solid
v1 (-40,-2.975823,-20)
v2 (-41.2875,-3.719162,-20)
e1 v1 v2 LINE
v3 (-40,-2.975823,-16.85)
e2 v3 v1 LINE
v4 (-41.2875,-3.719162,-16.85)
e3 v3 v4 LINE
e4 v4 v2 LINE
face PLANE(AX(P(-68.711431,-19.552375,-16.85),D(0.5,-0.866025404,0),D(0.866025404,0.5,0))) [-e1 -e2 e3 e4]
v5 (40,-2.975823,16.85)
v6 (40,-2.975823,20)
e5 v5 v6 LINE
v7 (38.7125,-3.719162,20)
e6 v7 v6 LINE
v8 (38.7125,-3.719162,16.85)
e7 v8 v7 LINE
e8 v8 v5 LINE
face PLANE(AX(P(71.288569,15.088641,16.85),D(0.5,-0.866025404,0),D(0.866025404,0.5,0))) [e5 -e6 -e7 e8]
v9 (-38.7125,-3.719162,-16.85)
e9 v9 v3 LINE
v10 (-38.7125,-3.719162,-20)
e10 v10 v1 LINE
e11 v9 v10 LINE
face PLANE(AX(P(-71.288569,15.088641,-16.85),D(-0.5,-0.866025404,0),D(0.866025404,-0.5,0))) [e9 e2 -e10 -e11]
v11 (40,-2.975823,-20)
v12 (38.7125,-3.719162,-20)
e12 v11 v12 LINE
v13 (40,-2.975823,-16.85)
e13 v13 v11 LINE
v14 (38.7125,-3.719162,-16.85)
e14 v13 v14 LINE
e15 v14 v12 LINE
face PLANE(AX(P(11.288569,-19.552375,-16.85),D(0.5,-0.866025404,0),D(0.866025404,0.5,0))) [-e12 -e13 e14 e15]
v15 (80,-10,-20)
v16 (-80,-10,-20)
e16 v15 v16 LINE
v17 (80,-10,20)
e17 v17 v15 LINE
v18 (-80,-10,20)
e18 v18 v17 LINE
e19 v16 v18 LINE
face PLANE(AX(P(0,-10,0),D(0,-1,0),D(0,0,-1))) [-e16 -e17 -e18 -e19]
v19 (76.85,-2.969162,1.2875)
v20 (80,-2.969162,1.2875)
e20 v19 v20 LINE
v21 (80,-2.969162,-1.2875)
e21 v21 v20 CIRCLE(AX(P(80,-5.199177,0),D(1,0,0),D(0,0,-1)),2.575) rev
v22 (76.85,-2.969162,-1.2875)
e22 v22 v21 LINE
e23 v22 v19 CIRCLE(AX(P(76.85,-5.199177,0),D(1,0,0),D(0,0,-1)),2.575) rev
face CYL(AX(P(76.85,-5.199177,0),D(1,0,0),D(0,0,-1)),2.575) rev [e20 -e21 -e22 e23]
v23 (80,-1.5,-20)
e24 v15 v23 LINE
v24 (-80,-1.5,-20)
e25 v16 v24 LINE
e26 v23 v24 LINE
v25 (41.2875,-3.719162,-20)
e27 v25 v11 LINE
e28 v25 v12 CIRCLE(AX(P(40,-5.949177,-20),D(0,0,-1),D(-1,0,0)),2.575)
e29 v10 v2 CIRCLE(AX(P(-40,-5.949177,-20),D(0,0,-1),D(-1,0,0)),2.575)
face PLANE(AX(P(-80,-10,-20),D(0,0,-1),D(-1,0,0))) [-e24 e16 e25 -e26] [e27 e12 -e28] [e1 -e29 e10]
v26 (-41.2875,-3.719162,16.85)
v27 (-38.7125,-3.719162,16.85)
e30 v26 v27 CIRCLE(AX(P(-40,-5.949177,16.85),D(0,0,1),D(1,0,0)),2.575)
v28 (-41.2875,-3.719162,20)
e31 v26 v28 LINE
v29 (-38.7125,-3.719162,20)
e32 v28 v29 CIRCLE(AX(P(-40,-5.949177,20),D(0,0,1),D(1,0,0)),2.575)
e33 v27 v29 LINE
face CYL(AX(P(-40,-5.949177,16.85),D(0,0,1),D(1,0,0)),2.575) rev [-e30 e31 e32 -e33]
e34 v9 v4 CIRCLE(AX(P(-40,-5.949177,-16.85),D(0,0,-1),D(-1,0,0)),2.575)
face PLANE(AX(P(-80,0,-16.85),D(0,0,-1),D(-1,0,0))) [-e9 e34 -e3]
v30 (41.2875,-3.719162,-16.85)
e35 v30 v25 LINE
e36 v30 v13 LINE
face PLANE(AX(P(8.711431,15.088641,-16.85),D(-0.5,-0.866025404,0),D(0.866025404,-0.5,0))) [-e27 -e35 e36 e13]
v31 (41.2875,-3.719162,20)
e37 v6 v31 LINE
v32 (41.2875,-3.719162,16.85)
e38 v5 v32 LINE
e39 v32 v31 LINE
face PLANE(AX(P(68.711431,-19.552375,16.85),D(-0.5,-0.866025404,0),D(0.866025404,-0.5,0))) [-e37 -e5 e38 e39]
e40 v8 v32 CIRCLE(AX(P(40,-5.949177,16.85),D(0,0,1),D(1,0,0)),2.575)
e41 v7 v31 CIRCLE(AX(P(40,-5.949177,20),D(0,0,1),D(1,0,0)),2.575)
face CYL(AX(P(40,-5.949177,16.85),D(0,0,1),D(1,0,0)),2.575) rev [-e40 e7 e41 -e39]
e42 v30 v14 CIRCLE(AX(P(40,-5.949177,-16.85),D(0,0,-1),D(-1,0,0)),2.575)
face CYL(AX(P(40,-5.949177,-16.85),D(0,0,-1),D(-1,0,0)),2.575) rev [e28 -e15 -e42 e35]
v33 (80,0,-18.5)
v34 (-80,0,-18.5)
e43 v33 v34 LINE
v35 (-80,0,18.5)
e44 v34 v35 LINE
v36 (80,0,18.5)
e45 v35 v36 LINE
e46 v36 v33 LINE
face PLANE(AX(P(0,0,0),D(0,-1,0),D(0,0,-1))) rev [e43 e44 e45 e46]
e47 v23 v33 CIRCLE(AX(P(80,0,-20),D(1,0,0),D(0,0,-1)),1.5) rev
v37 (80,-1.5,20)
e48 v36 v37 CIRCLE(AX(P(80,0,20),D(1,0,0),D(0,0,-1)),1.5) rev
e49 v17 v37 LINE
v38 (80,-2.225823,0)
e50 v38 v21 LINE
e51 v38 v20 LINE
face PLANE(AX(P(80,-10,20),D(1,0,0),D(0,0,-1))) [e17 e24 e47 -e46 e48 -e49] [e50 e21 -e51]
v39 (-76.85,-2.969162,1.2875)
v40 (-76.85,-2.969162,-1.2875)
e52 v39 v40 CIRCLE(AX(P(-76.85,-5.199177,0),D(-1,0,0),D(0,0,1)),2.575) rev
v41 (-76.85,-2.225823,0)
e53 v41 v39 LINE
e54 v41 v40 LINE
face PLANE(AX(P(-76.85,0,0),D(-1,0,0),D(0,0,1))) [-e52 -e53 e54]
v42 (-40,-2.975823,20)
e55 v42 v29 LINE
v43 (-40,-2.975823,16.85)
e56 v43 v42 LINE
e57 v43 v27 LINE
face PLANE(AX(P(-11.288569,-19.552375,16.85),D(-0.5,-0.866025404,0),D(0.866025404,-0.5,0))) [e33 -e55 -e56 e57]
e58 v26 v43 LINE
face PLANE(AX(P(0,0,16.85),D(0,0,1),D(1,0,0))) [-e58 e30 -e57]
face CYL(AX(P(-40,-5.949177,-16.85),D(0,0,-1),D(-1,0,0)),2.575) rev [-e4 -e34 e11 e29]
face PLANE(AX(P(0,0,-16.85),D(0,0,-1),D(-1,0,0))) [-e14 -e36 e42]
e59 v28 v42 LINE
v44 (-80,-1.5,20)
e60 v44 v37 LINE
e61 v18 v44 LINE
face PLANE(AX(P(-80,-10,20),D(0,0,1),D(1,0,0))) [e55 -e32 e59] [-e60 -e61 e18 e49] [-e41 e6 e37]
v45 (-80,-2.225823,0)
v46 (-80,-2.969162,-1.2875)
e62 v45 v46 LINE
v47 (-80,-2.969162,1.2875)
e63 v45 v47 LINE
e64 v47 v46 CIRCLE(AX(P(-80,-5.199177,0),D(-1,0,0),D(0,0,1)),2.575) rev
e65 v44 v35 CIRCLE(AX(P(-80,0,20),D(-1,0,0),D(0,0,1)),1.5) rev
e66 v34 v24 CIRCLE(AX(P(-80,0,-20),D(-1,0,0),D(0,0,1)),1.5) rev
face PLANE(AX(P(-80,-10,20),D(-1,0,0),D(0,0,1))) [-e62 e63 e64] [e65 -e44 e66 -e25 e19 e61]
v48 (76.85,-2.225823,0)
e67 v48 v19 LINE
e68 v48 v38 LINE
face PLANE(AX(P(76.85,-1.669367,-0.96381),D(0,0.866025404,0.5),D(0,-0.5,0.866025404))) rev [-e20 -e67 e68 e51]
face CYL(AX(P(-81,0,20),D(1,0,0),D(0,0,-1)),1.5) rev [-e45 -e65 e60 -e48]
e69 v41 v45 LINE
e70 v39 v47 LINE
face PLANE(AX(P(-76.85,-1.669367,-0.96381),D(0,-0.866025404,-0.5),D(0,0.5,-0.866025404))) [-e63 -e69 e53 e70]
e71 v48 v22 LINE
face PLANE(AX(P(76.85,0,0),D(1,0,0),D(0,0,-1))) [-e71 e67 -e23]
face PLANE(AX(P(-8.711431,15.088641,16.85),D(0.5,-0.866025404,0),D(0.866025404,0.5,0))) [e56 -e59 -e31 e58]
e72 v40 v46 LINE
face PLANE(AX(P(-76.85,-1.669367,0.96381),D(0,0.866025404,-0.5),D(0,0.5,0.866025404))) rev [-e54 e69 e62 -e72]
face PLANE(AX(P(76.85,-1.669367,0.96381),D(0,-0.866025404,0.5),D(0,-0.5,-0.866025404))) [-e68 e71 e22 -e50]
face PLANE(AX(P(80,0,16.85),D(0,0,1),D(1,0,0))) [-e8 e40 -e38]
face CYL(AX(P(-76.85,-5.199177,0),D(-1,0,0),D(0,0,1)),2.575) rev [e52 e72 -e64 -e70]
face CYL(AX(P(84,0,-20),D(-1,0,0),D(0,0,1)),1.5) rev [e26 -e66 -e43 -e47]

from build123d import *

# Parameters (mm, degrees)
SKETCH_1_W                         = 160
SKETCH_1_H                         = 40
EXTRUDE_1_DEPTH                    = 10
SWEEP_START                        = -80
SWEEP_1_DEPTH                      = 160
SWEEP_2_DEPTH                      = 160
SKETCH_16_R                        = 2.575
CUT_EXTRUDE_1_DEPTH                = 3.15
PATTERN_LINEAR_1_COUNT             = 2
PATTERN_LINEAR_1_PITCH             = 80
PATTERN_CIRCULAR_1_COUNT           = 2
PATTERN_CIRCULAR_1_COPY_1_SKETCH_R = 2.575
PATTERN_CIRCULAR_1_COPY_1_DEPTH    = 3.15
SKETCH_20_R                        = 2.575
CUT_EXTRUDE_2_DEPTH                = 3.15
PATTERN_CIRCULAR_2_COUNT           = 2


# Read off the part's stored shape, not the designer's step: Вырез-По траектории1, Вырез-По траектории2
with BuildPart() as part:
    # Эскиз1 → Бобышка-Вытянуть1 (new body)
    with BuildSketch(Plane(origin=(0, 0, 0), x_dir=(1, 0, 0), z_dir=(0, 1, 0))):
        Rectangle(SKETCH_1_W, SKETCH_1_H)
    extrude(amount=-EXTRUDE_1_DEPTH)

    # Вырез-По траектории1 outline → Вырез-По траектории1 (cut)
    with BuildSketch(Plane.YZ.offset(SWEEP_START)):
        with BuildLine():
            Line((0, 20), (-1.5, 20))
            ThreePointArc((-1.5, 20), (-1.060660172, 18.939339828), (0, 18.5))
            Line((0, 18.5), (0, 20))
        make_face()
    extrude(amount=SWEEP_1_DEPTH, mode=Mode.SUBTRACT)

    # Вырез-По траектории2 outline → Вырез-По траектории2 (cut)
    with BuildSketch(Plane.YZ.offset(SWEEP_START)):
        with BuildLine():
            ThreePointArc((0, -18.5), (-1.060660172, -18.939339828), (-1.5, -20))
            Line((-1.5, -20), (0, -20))
            Line((0, -20), (0, -18.5))
        make_face()
    extrude(amount=SWEEP_2_DEPTH, mode=Mode.SUBTRACT)

    # Эскиз16 → Вырез-Вытянуть1 (cut)
    with BuildSketch(Plane(origin=(0, 0, -20), x_dir=(-1, 0, 0), z_dir=(0, 0, -1))):
        with Locations((-40, -5.949176943)):
            Circle(SKETCH_16_R)
        with BuildLine():
            Line((-40, -2.975823057), (-41.2875, -3.719161528))
            ThreePointArc((-41.2875, -3.719161528), (-40, -3.374176943), (-38.7125, -3.719161528))
            Line((-38.7125, -3.719161528), (-40, -2.975823057))
        make_face()
    cut_extrude_1 = extrude(amount=-CUT_EXTRUDE_1_DEPTH, mode=Mode.SUBTRACT)

    # Линейный массив1: Вырез-Вытянуть1 ×2
    with Locations(*[(-i * PATTERN_LINEAR_1_PITCH, 0, 0) for i in range(1, PATTERN_LINEAR_1_COUNT)]):
        add(cut_extrude_1, mode=Mode.SUBTRACT)

    # Круговой массив1: Вырез-Вытянуть1 ×2 about axis
    pattern_circular_1_axis = Axis((0, -10, 0), (0, -1, 0))
    for i in range(1, PATTERN_CIRCULAR_1_COUNT):
        add(cut_extrude_1.rotate(pattern_circular_1_axis, i * 360 / PATTERN_CIRCULAR_1_COUNT), mode=Mode.SUBTRACT)

    # Круговой массив1 copy 1 sketch → Круговой массив1 copy 1 (cut)
    with BuildSketch(Plane(origin=(80, 0, 20), x_dir=(1, 0, 0), z_dir=(0, 0, 1))):
        with Locations((-40, -5.949176943)):
            Circle(PATTERN_CIRCULAR_1_COPY_1_SKETCH_R)
        with BuildLine():
            Line((-40, -2.975823057), (-41.2875, -3.719161528))
            ThreePointArc((-41.2875, -3.719161528), (-40, -3.374176943), (-38.7125, -3.719161528))
            Line((-38.7125, -3.719161528), (-40, -2.975823057))
        make_face()
    extrude(amount=-PATTERN_CIRCULAR_1_COPY_1_DEPTH, mode=Mode.SUBTRACT)

    # Эскиз20 → Вырез-Вытянуть2 (cut)
    with BuildSketch(Plane.ZY.offset(-80)):
        with Locations((0, -5.199176943)):
            Circle(SKETCH_20_R)
        with BuildLine():
            Line((1.2875, -2.969161528), (0, -2.225823057))
            Line((0, -2.225823057), (-1.2875, -2.969161528))
            ThreePointArc((-1.2875, -2.969161528), (0, -2.624176943), (1.2875, -2.969161528))
        make_face()
    cut_extrude_2 = extrude(amount=CUT_EXTRUDE_2_DEPTH, mode=Mode.SUBTRACT)

    # Круговой массив2: Вырез-Вытянуть2 ×2 about axis
    pattern_circular_2_axis = Axis((0, -10, 0), (0, -1, 0))
    for i in range(1, PATTERN_CIRCULAR_2_COUNT):
        add(cut_extrude_2.rotate(pattern_circular_2_axis, i * 360 / PATTERN_CIRCULAR_2_COUNT), mode=Mode.SUBTRACT)


solid = part.part
